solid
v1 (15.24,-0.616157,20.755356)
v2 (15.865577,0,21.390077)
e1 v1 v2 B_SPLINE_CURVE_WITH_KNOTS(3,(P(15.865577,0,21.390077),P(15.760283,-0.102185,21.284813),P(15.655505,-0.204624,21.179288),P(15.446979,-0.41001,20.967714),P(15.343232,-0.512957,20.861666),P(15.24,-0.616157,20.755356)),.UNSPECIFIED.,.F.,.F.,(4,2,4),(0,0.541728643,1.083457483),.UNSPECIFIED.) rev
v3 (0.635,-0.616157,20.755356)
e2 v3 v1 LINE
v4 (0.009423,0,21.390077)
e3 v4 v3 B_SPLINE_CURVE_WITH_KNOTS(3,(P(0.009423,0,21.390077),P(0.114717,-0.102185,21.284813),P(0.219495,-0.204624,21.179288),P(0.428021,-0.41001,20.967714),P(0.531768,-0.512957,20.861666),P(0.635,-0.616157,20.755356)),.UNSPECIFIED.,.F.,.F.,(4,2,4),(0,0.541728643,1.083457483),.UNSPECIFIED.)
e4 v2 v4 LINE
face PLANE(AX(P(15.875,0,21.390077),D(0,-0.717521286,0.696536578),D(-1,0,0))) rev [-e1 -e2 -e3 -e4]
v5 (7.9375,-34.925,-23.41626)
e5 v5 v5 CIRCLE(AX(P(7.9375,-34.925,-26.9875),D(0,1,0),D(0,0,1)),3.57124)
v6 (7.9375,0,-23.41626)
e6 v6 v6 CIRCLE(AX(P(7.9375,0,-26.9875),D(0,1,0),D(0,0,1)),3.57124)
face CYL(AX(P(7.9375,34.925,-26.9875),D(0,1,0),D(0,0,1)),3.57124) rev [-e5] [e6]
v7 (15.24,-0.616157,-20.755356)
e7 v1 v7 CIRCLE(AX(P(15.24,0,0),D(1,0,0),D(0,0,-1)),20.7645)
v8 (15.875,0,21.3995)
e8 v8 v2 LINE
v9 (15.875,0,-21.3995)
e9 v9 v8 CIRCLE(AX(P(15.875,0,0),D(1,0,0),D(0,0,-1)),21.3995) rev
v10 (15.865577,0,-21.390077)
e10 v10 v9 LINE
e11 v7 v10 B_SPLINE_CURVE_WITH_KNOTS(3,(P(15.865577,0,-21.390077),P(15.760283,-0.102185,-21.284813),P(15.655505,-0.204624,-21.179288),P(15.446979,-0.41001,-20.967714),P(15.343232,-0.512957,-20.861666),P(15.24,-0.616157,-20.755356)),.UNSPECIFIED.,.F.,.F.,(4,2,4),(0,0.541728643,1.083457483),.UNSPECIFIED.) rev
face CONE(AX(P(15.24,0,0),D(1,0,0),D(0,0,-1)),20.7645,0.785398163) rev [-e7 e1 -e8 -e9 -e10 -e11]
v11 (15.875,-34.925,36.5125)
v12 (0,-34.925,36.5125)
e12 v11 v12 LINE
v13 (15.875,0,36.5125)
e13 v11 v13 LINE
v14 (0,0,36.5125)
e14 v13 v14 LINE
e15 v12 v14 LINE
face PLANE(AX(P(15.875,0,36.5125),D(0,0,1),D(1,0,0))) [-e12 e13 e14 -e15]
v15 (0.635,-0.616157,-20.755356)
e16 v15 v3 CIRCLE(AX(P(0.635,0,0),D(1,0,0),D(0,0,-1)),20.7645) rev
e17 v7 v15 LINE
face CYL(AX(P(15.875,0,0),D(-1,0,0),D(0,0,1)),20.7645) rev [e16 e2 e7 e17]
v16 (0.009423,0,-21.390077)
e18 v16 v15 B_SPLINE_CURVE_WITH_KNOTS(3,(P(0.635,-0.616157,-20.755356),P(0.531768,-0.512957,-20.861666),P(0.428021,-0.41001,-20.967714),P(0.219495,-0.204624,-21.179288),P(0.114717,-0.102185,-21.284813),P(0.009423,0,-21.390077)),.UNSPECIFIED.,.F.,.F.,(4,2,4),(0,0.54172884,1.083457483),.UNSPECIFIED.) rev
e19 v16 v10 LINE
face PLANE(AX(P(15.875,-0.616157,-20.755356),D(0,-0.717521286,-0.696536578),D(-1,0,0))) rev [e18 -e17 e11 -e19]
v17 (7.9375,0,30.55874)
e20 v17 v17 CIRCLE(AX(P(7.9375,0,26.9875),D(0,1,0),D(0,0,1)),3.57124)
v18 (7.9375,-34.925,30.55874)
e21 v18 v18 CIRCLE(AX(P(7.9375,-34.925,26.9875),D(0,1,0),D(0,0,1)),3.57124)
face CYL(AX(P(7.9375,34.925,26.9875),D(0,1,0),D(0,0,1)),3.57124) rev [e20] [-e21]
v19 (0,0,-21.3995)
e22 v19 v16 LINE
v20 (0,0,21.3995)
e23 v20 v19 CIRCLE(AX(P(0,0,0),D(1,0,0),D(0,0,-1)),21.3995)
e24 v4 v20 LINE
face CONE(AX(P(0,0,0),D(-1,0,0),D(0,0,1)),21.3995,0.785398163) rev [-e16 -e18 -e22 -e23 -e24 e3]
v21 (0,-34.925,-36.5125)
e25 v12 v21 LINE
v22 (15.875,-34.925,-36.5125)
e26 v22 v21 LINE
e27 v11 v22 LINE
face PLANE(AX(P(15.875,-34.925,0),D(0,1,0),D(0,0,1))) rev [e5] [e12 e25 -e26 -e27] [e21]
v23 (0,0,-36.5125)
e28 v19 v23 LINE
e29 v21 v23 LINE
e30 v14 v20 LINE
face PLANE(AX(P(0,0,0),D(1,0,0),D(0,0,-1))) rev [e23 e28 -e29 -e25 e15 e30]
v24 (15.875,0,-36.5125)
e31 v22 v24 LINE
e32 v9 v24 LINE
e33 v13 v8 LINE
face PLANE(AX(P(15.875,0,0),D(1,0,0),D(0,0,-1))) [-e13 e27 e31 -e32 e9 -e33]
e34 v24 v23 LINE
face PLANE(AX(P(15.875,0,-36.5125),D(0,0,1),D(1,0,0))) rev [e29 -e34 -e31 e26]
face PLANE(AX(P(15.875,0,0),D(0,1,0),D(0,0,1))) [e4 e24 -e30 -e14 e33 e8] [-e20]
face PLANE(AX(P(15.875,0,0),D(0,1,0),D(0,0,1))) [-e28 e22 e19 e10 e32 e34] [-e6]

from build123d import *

# Parameters (mm, degrees)
BOSS_EXTRUDE1_DEPTH                           = 15.875
BOSS_EXTRUDE2_DEPTH                           = 15.875
CBORE_FOR_1_4_SOCKET_HEAD_CAP_SCREW1_AT_COUNT = 2
CBORE_FOR_1_4_SOCKET_HEAD_CAP_SCREW1_AT_PITCH = 53.975
MOVE_FACE1_BY                                 = 0.127
MOVE_FACE1_2_BY                               = 0.127
MOVE_START                                    = 28.575
MOVE_FACE2_OUTLINE_W                          = 15.875
MOVE_FACE2_OUTLINE_H                          = 73.025
MOVE_FACE2_OUTLINE_R                          = 5.55625
MOVE_FACE2_DEPTH                              = 6.35
MOVE_START_2                                  = 22.225
MOVE_FACE2_2_OUTLINE_R                        = 5.55625
MOVE_FACE2_2_OUTLINE_R_2                      = 3.57124
MOVE_FACE2_2_DEPTH                            = 6.35


with BuildPart() as part:
    # Sketch1 → Boss-Extrude1 (new body)
    with BuildSketch(Plane(origin=(0, 0, 0), x_dir=(0, 0, -1), z_dir=(1, 0, 0))):
        with BuildLine():
            Line((36.5125, 0), (20.6375, 0))
            ThreePointArc((20.6375, 0), (0, -20.6375), (-20.6375, 0))
            Line((-20.6375, 0), (-36.5125, 0))
            Line((-36.5125, 0), (-36.5125, -34.925))
            Line((-36.5125, -34.925), (36.5125, -34.925))
            Line((36.5125, -34.925), (36.5125, 0))
        make_face()
    extrude(amount=BOSS_EXTRUDE1_DEPTH)


with BuildPart() as body_2:
    # Sketch1<3> → Boss-Extrude2 (new body)
    with BuildSketch(Plane(origin=(0, 0, 0), x_dir=(0, 0, -1), z_dir=(1, 0, 0))):
        with BuildLine():
            ThreePointArc((-20.6375, 0), (0, 20.6375), (20.6375, 0))
            Line((20.6375, 0), (36.5125, 0))
            Line((36.5125, 0), (36.5125, 34.925))
            Line((36.5125, 34.925), (-36.5125, 34.925))
            Line((-36.5125, 34.925), (-36.5125, 0))
            Line((-36.5125, 0), (-20.6375, 0))
        make_face()
    extrude(amount=BOSS_EXTRUDE2_DEPTH)


with BuildPart() as cbore_for_1_4_socket_head_cap_screw1_tool:
    # Sketch4 → CBORE for 1/4 Socket Head Cap Screw1 (revolve)
    with BuildSketch(Plane(origin=(7.9375, 34.925, 26.9875), x_dir=(0, 0, 1), z_dir=(1, 0, 0))):
        Polygon((0, 0), (0, 69.85), (3.57124, 69.85), (3.57124, 6.35), (5.55625, 6.35), (5.55625, 0.635), (6.19125, 0), align=None)
    cbore_for_1_4_socket_head_cap_screw1 = revolve(axis=Axis((7.9375, 41.275, 26.9875), (0, -1, 0)))


with BuildPart() as part_1:
    add(part.part)

    # CBORE for 1/4 Socket Head Cap Screw1: cut by cbore_for_1_4_socket_head_cap_screw1_tool
    add(cbore_for_1_4_socket_head_cap_screw1_tool.part, mode=Mode.SUBTRACT)


with BuildPart() as body_2_1:
    add(body_2.part)

    # CBORE for 1/4 Socket Head Cap Screw1: cut by cbore_for_1_4_socket_head_cap_screw1_tool
    add(cbore_for_1_4_socket_head_cap_screw1_tool.part, mode=Mode.SUBTRACT)


with BuildPart() as cbore_for_1_4_socket_head_cap_screw1_at_tool:
    # CBORE for 1/4 Socket Head Cap Screw1 at: CBORE for 1/4 Socket Head Cap Screw1 ×2
    with Locations(*[(0, 0, -i * CBORE_FOR_1_4_SOCKET_HEAD_CAP_SCREW1_AT_PITCH) for i in range(1, CBORE_FOR_1_4_SOCKET_HEAD_CAP_SCREW1_AT_COUNT)]):
        add(cbore_for_1_4_socket_head_cap_screw1)


with BuildPart() as part_2:
    add(part_1.part)

    # CBORE for 1/4 Socket Head Cap Screw1 at: cut by cbore_for_1_4_socket_head_cap_screw1_at_tool
    add(cbore_for_1_4_socket_head_cap_screw1_at_tool.part, mode=Mode.SUBTRACT)

    # Move Face1 2: a curved face moved inward by 0.127
    add(Solid.thicken(part_2.faces().sort_by_distance((7.9375, -20.6375, 0))[0], -MOVE_FACE1_2_BY), mode=Mode.SUBTRACT)

    # Chamfer1
    # the kernel refuses this chamfer: 0.635 mm, written as the material it takes off along each edge
    with BuildSketch(Plane(origin=(0, 0, 0), x_dir=(0, 0.07868977926472538, -0.9968991516895122), z_dir=(0, 0.9968991516895122, 0.07868977926472538))) as chamfer1_piece_1:
        with BuildLine():
            Line((21.417460512, 0.017960512), (20.746539488, -0.652960512))
            Line((20.746539488, -0.652960512), (20.733839488, -0.652960512))
            ThreePointArc((20.733839488, -0.652960512), (20.7518, -0.326480256), (20.7518, 0))
            Line((20.7518, 0), (20.7645, 0.0127))
            ThreePointArc((20.7645, 0.0127), (21.090980256, 0.0127), (21.417460512, 0.030660512))
            Line((21.417460512, 0.030660512), (21.417460512, 0.017960512))
        make_face()
    revolve(axis=Axis((0, 0, 0), (-1, 0, 0)), revolution_arc=189.026516368, mode=Mode.SUBTRACT)
    with BuildSketch(Plane(origin=(-1.610111621, 0, -20.7645), x_dir=(0, 0, -1), z_dir=(1, 0, 0))) as chamfer1_piece_2:
        with BuildLine():
            Line((0.643801601, 0.017692029), (-0.027368853, -0.633849299))
            Line((-0.027368853, -0.633849299), (-0.040063261, -0.633472445))
            ThreePointArc((-0.040063261, -0.633472445), (-0.015119867, -0.316902726), (-0.0127, 0))
            Line((-0.0127, 0), (0, 0.0127))
            ThreePointArc((0, 0.0127), (0.3219008, 0.0127), (0.643801601, 0.030392029))
            Line((0.643801601, 0.030392029), (0.643801601, 0.017692029))
        make_face()
    extrude(amount=19.095223242, mode=Mode.SUBTRACT)
    with BuildSketch(Plane(origin=(-1.610111621, 0, 20.7645), x_dir=(0, -0.9998899044534173, -0.01483842889716635), z_dir=(1, 0, 0))) as chamfer1_piece_3:
        with BuildLine():
            Line((0.634185626, 0.017960512), (-0.027243086, -0.643468199))
            Line((-0.027243086, -0.643468199), (-0.039941687, -0.643279751))
            ThreePointArc((-0.039941687, -0.643279751), (-0.017475104, -0.321676913), (-0.012698602, 0.000188448))
            Line((-0.012698602, 0.000188448), (0.000188448, 0.012698602))
            ThreePointArc((0.000188448, 0.012698602), (0.317092192, 0.010415864), (0.633997178, 0.030659114))
            Line((0.633997178, 0.030659114), (0.634185626, 0.017960512))
        make_face()
    extrude(amount=19.095223242, mode=Mode.SUBTRACT)
    with BuildSketch(Plane(origin=(15.875, 0, 0), x_dir=(0, 0.0786897792647254, -0.9968991516895122), z_dir=(0, 0.9968991516895122, 0.0786897792647254))) as chamfer1_piece_4:
        with BuildLine():
            Line((20.746539488, 0.652960512), (21.417460512, -0.017960512))
            Line((21.417460512, -0.017960512), (21.417460512, -0.030660512))
            ThreePointArc((21.417460512, -0.030660512), (21.090980256, -0.0127), (20.7645, -0.0127))
            Line((20.7645, -0.0127), (20.7518, 0))
            ThreePointArc((20.7518, 0), (20.7518, 0.326480256), (20.733839488, 0.652960512))
            Line((20.733839488, 0.652960512), (20.746539488, 0.652960512))
        make_face()
    revolve(axis=Axis((15.875, 0, 0), (-1, 0, 0)), revolution_arc=189.026516368, mode=Mode.SUBTRACT)


with BuildPart() as body_2_2:
    add(body_2_1.part)

    # CBORE for 1/4 Socket Head Cap Screw1 at: cut by cbore_for_1_4_socket_head_cap_screw1_at_tool
    add(cbore_for_1_4_socket_head_cap_screw1_at_tool.part, mode=Mode.SUBTRACT)

    # Move Face1: a curved face moved inward by 0.127
    add(Solid.thicken(body_2_2.faces().sort_by_distance((7.9375, 20.6375, 0))[0], -MOVE_FACE1_BY), mode=Mode.SUBTRACT)

    # Move Face2: read off the stored shape, not the designer's step
    # Move Face2 outline → Move Face2 (cut)
    with BuildSketch(Plane(origin=(0, 0, 0), x_dir=(1, 0, 0), z_dir=(0, 1, 0)).offset(MOVE_START)):
        with Locations((7.9375, 0)):
            Rectangle(MOVE_FACE2_OUTLINE_W, MOVE_FACE2_OUTLINE_H)
        with Locations((7.9375, -26.9875)):
            Circle(MOVE_FACE2_OUTLINE_R, mode=Mode.SUBTRACT)
        with Locations((7.9375, 26.9875)):
            Circle(MOVE_FACE2_OUTLINE_R, mode=Mode.SUBTRACT)
    extrude(amount=MOVE_FACE2_DEPTH, mode=Mode.SUBTRACT)

    # Move Face2 2 outline → Move Face2 2 (cut)
    # profile 1 of 2: a face of its own
    with BuildSketch(Plane(origin=(0, 0, 0), x_dir=(1, 0, 0), z_dir=(0, 1, 0)).offset(MOVE_START_2)):
        with Locations((7.9375, 26.9875)):
            Circle(MOVE_FACE2_2_OUTLINE_R)
        with Locations((7.9375, 26.9875)):
            Circle(MOVE_FACE2_2_OUTLINE_R_2, mode=Mode.SUBTRACT)
    # profile 2 of 2: a face of its own
    with BuildSketch(Plane(origin=(0, 0, 0), x_dir=(1, 0, 0), z_dir=(0, 1, 0)).offset(MOVE_START_2)):
        with Locations((7.9375, -26.9875)):
            Circle(MOVE_FACE2_2_OUTLINE_R)
        with Locations((7.9375, -26.9875)):
            Circle(MOVE_FACE2_2_OUTLINE_R_2, mode=Mode.SUBTRACT)
    extrude(amount=MOVE_FACE2_2_DEPTH, mode=Mode.SUBTRACT)

    # Move Face2 3: loft between two sections, ruled curve by curve
    move_face2_3_from = [
        Edge.make_three_point_arc((7.9375, 27.94, -21.43125), (13.49375, 27.94, -26.9875), (7.9375, 27.94, -32.54375)),
        Edge.make_three_point_arc((7.9375, 27.94, -32.54375), (2.38125, 27.94, -26.9875), (7.9375, 27.94, -21.43125)),
    ]
    move_face2_3_to = [
        Edge.make_three_point_arc((7.9375, 28.575, -20.79625), (14.12875, 28.575, -26.9875), (7.9375, 28.575, -33.17875)),
        Edge.make_three_point_arc((7.9375, 28.575, -33.17875), (1.74625, 28.575, -26.9875), (7.9375, 28.575, -20.79625)),
    ]
    move_face2_3 = Solid(Shell([*[Face.make_surface_from_curves(move_face2_3_from[k], move_face2_3_to[k]) for k in range(2)], Face(Wire(move_face2_3_from)), Face(Wire(move_face2_3_to))]))
    add(move_face2_3, mode=Mode.SUBTRACT)

    # Move Face2 4: loft between two sections, ruled curve by curve
    move_face2_4_from = [
        Edge.make_three_point_arc((7.9375, 27.94, 32.54375), (13.49375, 27.94, 26.9875), (7.9375, 27.94, 21.43125)),
        Edge.make_three_point_arc((7.9375, 27.94, 21.43125), (2.38125, 27.94, 26.9875), (7.9375, 27.94, 32.54375)),
    ]
    move_face2_4_to = [
        Edge.make_three_point_arc((7.9375, 28.575, 33.17875), (14.12875, 28.575, 26.9875), (7.9375, 28.575, 20.79625)),
        Edge.make_three_point_arc((7.9375, 28.575, 20.79625), (1.74625, 28.575, 26.9875), (7.9375, 28.575, 33.17875)),
    ]
    move_face2_4 = Solid(Shell([*[Face.make_surface_from_curves(move_face2_4_from[k], move_face2_4_to[k]) for k in range(2)], Face(Wire(move_face2_4_from)), Face(Wire(move_face2_4_to))]))
    add(move_face2_4, mode=Mode.SUBTRACT)

    # Chamfer2
    # the kernel refuses this chamfer: 0.635 mm, written as the material it takes off along each edge
    with BuildSketch(Plane(origin=(0, 0, 0), x_dir=(0, -0.0786897792647251, 0.9968991516895122), z_dir=(0, -0.9968991516895122, -0.0786897792647251))) as chamfer2_piece_1:
        with BuildLine():
            Line((21.417460512, 0.017960512), (20.746539488, -0.652960512))
            Line((20.746539488, -0.652960512), (20.733839488, -0.652960512))
            ThreePointArc((20.733839488, -0.652960512), (20.7518, -0.326480256), (20.7518, 0))
            Line((20.7518, 0), (20.7645, 0.0127))
            ThreePointArc((20.7645, 0.0127), (21.090980256, 0.0127), (21.417460512, 0.030660512))
            Line((21.417460512, 0.030660512), (21.417460512, 0.017960512))
        make_face()
    revolve(axis=Axis((0, 0, 0), (-1, 0, 0)), revolution_arc=189.026516368, mode=Mode.SUBTRACT)
    with BuildSketch(Plane(origin=(-1.610111621, 0, 20.7645), x_dir=(0, 0, 1), z_dir=(1, 0, 0))) as chamfer2_piece_2:
        with BuildLine():
            Line((0.643801601, 0.017692029), (-0.027368853, -0.633849299))
            Line((-0.027368853, -0.633849299), (-0.040063261, -0.633472445))
            ThreePointArc((-0.040063261, -0.633472445), (-0.015119867, -0.316902726), (-0.0127, 0))
            Line((-0.0127, 0), (0, 0.0127))
            ThreePointArc((0, 0.0127), (0.3219008, 0.0127), (0.643801601, 0.030392029))
            Line((0.643801601, 0.030392029), (0.643801601, 0.017692029))
        make_face()
    extrude(amount=19.095223242, mode=Mode.SUBTRACT)
    with BuildSketch(Plane(origin=(-1.610111621, 0, -20.7645), x_dir=(0, 0.9998899044534173, 0.014838428897166573), z_dir=(1, 0, 0))) as chamfer2_piece_3:
        with BuildLine():
            Line((0.634185626, 0.017960512), (-0.027243086, -0.643468199))
            Line((-0.027243086, -0.643468199), (-0.039941687, -0.643279751))
            ThreePointArc((-0.039941687, -0.643279751), (-0.017475104, -0.321676913), (-0.012698602, 0.000188448))
            Line((-0.012698602, 0.000188448), (0.000188448, 0.012698602))
            ThreePointArc((0.000188448, 0.012698602), (0.317092192, 0.010415864), (0.633997178, 0.030659114))
            Line((0.633997178, 0.030659114), (0.634185626, 0.017960512))
        make_face()
    extrude(amount=19.095223242, mode=Mode.SUBTRACT)
    with BuildSketch(Plane(origin=(15.875, 0, 0), x_dir=(0, -0.07868977926472513, 0.9968991516895122), z_dir=(0, -0.9968991516895122, -0.07868977926472513))) as chamfer2_piece_4:
        with BuildLine():
            Line((20.746539488, 0.652960512), (21.417460512, -0.017960512))
            Line((21.417460512, -0.017960512), (21.417460512, -0.030660512))
            ThreePointArc((21.417460512, -0.030660512), (21.090980256, -0.0127), (20.7645, -0.0127))
            Line((20.7645, -0.0127), (20.7518, 0))
            ThreePointArc((20.7518, 0), (20.7518, 0.326480256), (20.733839488, 0.652960512))
            Line((20.733839488, 0.652960512), (20.746539488, 0.652960512))
        make_face()
    revolve(axis=Axis((15.875, 0, 0), (-1, 0, 0)), revolution_arc=189.026516368, mode=Mode.SUBTRACT)


solid = part_2.part
